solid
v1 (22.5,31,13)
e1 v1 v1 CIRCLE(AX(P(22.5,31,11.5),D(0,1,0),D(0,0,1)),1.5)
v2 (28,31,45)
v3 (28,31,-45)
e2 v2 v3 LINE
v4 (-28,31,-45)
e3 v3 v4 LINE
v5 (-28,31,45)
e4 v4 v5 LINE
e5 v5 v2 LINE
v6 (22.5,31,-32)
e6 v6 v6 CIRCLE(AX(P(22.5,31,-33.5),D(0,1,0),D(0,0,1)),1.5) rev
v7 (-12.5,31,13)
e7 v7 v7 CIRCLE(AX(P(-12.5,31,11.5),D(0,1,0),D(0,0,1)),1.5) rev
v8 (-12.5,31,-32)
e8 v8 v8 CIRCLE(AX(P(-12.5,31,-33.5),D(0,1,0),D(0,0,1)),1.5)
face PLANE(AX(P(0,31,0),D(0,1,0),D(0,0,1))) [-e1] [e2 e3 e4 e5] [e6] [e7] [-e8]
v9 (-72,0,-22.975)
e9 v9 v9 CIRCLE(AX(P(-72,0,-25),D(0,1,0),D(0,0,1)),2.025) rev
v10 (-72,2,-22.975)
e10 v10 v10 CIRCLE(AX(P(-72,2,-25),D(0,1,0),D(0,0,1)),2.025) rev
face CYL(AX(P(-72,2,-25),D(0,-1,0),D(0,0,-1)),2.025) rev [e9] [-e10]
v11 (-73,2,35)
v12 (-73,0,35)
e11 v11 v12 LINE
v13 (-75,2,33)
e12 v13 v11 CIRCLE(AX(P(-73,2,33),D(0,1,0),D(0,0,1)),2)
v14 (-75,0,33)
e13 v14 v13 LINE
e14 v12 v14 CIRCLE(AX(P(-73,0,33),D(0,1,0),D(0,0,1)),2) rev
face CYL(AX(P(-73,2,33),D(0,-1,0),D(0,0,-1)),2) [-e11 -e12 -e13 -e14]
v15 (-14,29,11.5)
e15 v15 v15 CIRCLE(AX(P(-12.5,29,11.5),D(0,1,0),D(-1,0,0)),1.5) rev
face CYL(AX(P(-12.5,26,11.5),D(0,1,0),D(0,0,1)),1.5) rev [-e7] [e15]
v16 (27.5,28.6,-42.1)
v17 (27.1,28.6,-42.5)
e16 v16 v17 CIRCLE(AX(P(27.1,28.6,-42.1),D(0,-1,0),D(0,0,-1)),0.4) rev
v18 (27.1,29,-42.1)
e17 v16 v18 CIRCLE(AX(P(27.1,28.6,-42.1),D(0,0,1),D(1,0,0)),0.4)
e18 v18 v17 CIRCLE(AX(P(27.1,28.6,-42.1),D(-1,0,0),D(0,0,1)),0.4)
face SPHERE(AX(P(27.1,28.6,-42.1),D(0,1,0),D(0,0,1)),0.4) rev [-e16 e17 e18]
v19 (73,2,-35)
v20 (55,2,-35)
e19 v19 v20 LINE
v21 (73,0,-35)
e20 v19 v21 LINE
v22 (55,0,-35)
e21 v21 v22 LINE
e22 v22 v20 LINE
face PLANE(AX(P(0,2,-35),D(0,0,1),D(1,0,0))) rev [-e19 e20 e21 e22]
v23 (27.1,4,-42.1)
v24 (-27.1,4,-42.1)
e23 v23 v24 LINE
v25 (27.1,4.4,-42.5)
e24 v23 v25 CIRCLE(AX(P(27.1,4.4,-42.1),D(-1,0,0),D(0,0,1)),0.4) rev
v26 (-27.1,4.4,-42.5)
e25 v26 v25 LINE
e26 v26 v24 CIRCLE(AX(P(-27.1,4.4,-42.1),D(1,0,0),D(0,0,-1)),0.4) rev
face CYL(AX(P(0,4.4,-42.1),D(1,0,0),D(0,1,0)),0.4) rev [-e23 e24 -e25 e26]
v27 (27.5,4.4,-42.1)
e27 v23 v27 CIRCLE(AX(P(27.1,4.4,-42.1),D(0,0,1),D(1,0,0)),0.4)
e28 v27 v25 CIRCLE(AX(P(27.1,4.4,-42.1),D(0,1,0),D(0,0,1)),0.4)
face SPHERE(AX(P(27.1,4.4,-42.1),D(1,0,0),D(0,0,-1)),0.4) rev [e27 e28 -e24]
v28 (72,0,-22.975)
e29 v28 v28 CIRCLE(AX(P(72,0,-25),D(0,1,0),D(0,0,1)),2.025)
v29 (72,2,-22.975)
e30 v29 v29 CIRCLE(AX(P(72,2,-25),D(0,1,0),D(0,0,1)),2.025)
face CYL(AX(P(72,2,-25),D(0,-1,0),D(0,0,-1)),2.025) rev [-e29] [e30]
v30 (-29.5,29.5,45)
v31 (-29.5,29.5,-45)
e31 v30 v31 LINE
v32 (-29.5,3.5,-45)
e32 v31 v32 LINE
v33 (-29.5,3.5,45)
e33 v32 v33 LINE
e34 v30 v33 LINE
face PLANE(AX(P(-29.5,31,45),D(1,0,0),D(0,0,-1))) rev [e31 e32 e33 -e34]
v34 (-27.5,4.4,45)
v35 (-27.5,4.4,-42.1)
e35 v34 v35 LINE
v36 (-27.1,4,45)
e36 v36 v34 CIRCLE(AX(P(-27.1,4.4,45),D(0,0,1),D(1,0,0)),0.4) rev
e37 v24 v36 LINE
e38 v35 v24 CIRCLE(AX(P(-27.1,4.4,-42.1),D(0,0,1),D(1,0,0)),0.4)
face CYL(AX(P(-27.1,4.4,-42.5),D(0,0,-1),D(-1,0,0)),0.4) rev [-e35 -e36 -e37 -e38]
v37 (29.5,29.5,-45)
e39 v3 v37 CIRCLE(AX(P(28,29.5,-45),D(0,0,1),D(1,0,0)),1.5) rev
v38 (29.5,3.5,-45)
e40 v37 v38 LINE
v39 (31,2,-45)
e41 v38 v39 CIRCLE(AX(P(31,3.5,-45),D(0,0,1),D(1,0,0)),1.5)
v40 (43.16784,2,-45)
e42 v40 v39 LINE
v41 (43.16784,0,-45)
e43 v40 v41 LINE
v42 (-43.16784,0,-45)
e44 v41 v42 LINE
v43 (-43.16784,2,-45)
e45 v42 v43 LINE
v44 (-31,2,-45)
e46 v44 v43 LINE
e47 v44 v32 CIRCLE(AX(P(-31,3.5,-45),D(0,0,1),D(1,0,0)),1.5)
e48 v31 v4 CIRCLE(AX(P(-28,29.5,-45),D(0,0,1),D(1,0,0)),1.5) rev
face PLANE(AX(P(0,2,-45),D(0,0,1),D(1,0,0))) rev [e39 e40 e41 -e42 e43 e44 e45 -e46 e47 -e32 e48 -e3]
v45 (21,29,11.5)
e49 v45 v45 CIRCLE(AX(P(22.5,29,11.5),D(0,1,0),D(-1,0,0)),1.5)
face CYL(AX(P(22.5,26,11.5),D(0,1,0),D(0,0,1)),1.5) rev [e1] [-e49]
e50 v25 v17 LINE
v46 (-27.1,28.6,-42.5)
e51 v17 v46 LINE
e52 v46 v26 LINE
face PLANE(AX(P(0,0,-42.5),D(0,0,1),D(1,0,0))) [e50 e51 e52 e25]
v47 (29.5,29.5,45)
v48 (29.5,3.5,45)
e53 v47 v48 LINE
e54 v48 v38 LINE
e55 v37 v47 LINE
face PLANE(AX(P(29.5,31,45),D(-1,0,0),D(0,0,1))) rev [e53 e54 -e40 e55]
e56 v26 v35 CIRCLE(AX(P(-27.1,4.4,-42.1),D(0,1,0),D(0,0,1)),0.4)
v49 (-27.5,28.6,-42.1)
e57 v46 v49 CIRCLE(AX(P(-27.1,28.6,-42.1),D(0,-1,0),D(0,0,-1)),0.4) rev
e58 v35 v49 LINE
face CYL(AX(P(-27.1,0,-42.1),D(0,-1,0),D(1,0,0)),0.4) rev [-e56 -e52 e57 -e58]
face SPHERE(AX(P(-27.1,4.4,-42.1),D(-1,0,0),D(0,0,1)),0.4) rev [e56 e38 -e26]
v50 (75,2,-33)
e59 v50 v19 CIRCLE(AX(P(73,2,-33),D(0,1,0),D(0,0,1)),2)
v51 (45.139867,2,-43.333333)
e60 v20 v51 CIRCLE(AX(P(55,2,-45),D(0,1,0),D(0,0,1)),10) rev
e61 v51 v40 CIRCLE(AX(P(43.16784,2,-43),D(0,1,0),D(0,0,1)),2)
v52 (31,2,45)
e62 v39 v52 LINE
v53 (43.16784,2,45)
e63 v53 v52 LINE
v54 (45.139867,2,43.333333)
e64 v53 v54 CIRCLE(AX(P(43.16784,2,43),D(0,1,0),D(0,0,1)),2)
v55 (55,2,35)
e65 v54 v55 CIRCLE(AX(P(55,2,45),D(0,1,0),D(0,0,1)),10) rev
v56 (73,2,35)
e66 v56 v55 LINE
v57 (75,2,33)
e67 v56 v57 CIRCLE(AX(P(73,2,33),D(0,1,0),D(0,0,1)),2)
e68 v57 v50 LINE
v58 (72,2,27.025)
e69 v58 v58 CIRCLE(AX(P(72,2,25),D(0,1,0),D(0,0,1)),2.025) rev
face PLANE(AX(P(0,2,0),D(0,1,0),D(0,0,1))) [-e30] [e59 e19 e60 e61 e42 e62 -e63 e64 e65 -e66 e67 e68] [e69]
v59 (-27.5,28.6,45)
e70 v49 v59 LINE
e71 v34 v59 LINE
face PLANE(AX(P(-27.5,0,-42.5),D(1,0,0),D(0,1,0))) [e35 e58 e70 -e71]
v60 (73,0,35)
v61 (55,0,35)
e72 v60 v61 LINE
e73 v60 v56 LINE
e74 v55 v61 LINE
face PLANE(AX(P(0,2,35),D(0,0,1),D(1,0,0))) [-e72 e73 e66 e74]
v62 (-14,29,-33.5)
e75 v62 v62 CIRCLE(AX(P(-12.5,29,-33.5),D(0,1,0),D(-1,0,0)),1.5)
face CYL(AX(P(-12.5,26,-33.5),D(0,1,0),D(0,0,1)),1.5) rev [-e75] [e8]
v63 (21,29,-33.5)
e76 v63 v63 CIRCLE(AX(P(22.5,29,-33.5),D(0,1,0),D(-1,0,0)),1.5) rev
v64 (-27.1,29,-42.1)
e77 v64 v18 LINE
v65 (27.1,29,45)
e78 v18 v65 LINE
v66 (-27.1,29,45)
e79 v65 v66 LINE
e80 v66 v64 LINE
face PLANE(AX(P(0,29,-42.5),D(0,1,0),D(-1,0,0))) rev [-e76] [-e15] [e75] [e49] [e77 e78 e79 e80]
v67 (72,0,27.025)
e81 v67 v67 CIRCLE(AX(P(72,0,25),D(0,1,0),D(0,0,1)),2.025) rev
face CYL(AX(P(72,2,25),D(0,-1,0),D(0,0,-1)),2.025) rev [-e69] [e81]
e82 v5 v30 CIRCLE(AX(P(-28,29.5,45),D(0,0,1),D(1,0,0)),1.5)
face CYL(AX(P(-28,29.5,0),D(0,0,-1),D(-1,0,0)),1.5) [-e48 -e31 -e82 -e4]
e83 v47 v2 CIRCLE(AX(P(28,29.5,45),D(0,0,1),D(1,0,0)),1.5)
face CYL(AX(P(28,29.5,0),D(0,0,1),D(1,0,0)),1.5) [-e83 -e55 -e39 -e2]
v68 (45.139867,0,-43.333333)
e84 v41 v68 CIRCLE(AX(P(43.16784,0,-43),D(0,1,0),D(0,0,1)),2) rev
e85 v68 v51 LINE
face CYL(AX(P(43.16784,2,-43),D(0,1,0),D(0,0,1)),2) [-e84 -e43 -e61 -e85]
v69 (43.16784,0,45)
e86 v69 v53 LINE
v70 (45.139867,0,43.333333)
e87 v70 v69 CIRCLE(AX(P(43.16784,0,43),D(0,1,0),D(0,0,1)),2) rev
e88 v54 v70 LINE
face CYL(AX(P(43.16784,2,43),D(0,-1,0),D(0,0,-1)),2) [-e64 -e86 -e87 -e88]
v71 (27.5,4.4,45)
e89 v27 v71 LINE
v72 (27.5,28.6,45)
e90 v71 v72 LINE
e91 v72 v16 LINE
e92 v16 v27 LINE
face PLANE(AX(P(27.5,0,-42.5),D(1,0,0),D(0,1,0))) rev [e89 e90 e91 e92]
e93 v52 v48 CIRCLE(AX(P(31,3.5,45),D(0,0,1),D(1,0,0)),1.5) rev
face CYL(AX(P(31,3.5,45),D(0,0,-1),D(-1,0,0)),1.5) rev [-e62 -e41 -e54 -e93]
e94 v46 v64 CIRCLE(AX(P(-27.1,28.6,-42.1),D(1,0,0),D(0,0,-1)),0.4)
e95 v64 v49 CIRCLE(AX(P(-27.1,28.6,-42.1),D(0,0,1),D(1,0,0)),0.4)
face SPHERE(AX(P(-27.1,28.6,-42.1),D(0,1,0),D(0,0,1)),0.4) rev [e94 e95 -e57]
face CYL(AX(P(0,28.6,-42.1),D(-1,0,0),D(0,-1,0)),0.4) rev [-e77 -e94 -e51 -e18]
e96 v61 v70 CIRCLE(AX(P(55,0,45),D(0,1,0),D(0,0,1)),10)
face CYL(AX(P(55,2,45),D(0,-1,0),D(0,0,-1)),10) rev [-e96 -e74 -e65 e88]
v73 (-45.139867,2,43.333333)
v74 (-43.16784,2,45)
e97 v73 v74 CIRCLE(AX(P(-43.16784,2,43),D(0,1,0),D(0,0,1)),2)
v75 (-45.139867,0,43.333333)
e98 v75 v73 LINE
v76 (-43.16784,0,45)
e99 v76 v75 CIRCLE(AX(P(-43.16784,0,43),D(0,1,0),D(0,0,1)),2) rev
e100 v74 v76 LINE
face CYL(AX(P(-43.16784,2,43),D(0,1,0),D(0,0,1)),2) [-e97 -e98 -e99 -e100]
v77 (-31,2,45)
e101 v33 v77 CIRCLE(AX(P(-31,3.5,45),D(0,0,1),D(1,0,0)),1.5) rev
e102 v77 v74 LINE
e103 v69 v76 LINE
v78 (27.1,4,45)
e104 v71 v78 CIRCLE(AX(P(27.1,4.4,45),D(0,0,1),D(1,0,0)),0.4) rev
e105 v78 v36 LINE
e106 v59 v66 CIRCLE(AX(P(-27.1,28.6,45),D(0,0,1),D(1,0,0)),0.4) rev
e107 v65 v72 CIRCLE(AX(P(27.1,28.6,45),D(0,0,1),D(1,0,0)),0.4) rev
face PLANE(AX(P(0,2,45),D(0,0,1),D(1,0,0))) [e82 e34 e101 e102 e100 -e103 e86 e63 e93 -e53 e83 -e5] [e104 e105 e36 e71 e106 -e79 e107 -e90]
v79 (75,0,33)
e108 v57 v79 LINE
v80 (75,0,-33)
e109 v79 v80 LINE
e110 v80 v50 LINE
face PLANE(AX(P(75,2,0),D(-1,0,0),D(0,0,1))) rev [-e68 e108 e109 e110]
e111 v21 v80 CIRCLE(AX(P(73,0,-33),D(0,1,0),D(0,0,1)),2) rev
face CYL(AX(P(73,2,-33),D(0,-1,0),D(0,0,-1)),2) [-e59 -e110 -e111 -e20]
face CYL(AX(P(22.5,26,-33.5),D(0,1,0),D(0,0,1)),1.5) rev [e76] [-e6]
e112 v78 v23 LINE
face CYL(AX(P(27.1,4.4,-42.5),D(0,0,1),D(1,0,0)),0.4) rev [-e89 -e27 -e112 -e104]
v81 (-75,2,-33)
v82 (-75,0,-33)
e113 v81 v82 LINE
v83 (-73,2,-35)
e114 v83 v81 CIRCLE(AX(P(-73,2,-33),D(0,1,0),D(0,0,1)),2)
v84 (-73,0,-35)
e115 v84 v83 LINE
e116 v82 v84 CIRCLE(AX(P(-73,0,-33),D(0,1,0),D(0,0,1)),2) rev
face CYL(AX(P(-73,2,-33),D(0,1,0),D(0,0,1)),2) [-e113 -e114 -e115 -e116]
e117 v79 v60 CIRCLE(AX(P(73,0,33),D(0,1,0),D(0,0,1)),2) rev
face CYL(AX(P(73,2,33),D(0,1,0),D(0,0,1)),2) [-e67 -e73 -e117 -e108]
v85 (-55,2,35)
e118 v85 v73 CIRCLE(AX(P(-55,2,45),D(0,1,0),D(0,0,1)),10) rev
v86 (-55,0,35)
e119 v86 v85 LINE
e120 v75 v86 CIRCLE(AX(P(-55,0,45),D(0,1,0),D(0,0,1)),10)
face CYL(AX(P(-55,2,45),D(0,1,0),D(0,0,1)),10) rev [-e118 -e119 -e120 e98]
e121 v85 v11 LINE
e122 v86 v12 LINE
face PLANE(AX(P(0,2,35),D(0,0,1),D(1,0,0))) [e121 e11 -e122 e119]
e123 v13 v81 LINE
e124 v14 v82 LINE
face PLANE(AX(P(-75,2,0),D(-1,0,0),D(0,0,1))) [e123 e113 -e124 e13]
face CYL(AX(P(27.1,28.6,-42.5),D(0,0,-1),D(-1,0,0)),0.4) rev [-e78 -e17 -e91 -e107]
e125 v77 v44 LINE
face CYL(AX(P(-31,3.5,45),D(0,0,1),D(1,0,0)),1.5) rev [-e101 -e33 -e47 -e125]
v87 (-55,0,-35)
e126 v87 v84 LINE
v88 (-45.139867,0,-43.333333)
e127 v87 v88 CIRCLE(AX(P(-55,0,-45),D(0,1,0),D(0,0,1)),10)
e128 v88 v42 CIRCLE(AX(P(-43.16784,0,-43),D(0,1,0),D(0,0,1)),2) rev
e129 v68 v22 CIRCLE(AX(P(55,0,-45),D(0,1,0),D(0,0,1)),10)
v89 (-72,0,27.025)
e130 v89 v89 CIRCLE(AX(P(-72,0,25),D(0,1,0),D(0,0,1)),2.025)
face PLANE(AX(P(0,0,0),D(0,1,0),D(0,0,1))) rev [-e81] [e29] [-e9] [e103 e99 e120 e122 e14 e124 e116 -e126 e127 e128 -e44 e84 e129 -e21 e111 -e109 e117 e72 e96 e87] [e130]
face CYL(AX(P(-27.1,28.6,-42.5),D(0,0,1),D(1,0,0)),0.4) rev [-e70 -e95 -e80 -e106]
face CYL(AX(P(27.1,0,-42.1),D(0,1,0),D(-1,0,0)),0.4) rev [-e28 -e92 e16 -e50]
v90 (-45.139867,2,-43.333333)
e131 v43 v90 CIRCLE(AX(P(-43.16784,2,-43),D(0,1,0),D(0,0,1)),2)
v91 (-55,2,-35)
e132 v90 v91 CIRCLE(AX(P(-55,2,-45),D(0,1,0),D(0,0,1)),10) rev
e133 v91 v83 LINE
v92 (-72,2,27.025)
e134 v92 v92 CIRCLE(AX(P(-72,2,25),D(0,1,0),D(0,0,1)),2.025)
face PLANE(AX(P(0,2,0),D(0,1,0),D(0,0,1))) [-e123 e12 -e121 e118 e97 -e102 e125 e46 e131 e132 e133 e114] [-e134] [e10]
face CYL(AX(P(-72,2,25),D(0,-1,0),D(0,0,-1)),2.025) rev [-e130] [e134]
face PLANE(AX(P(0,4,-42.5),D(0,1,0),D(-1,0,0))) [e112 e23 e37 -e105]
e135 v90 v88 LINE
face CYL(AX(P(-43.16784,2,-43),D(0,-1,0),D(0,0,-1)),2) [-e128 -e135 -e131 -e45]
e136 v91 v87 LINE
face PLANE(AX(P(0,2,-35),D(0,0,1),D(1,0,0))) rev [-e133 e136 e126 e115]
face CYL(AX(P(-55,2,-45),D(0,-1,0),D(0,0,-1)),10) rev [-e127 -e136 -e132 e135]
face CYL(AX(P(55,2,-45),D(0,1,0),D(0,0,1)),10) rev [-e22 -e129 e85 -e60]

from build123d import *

# Parameters (mm, degrees)
SKETCH1_W           = 90
SKETCH1_H           = 70
SKETCH1_W_2         = 30
SKETCH1_R           = 2.025
SKETCH1_H_2         = 10
BOSS_EXTRUDE1_DEPTH = 2
SKETCH2_W           = 59
SKETCH2_H           = 90
BOSS_EXTRUDE2_DEPTH = 29
SKETCH4_W           = 55
SKETCH4_H           = 25
CUT_EXTRUDE1_DEPTH  = 87.5
FILLET1_R           = 1.5
FILLET2_R           = 0.4
FILLET3_R           = 10
FILLET7_R           = 2
SKETCH7_R           = 1.5
CUT_EXTRUDE2_DEPTH  = 5


with BuildPart() as part:
    # Sketch1 → Boss-Extrude1 (new body)
    # profile 1 of 5: a face of its own
    with BuildSketch(Plane(origin=(0, 0, 0), x_dir=(1, 0, 0), z_dir=(0, 1, 0))):
        Rectangle(SKETCH1_W, SKETCH1_H)
    # profile 2 of 5: a face of its own
    with BuildSketch(Plane(origin=(0, 0, 0), x_dir=(1, 0, 0), z_dir=(0, 1, 0))):
        with Locations((-60, 0)):
            Rectangle(SKETCH1_W_2, SKETCH1_H)
        with Locations(Location((-72, -25, 0), (0, 0, 270))):
            Circle(SKETCH1_R, mode=Mode.SUBTRACT)
        with Locations(Location((-72, 25, 0), (0, 0, 270))):
            Circle(SKETCH1_R, mode=Mode.SUBTRACT)
    # profile 3 of 5: a face of its own
    with BuildSketch(Plane(origin=(0, 0, 0), x_dir=(1, 0, 0), z_dir=(0, 1, 0))):
        with Locations((60, 0)):
            Rectangle(SKETCH1_W_2, SKETCH1_H)
        with Locations(Location((72, -25, 0), (0, 0, 270))):
            Circle(SKETCH1_R, mode=Mode.SUBTRACT)
        with Locations(Location((72, 25, 0), (0, 0, 270))):
            Circle(SKETCH1_R, mode=Mode.SUBTRACT)
    # profile 4 of 5: a face of its own
    with BuildSketch(Plane(origin=(0, 0, 0), x_dir=(1, 0, 0), z_dir=(0, 1, 0))):
        with Locations((0, -40)):
            Rectangle(SKETCH1_W, SKETCH1_H_2)
    # profile 5 of 5: a face of its own
    with BuildSketch(Plane(origin=(0, 0, 0), x_dir=(1, 0, 0), z_dir=(0, 1, 0))):
        with Locations((0, 40)):
            Rectangle(SKETCH1_W, SKETCH1_H_2)
    extrude(amount=BOSS_EXTRUDE1_DEPTH)

    # Sketch2 → Boss-Extrude2 (add)
    with BuildSketch(Plane(origin=(0, 2, 0), x_dir=(1, 0, 0), z_dir=(0, 1, 0))):
        Rectangle(SKETCH2_W, SKETCH2_H)
    extrude(amount=BOSS_EXTRUDE2_DEPTH)

    # Sketch4 → Cut-Extrude1 (cut)
    with BuildSketch(Plane.XY.offset(45)):
        with Locations((0, 16.5)):
            Rectangle(SKETCH4_W, SKETCH4_H)
    extrude(amount=-CUT_EXTRUDE1_DEPTH, mode=Mode.SUBTRACT)

    # Fillet1
    fillet1_edges = [part.edges().sort_by_distance(p)[0] for p in [
        (-29.5, 2, 0),
        (29.5, 2, 0),
        (-29.5, 31, 0),
        (29.5, 31, 0),
    ]]
    fillet(fillet1_edges, radius=FILLET1_R)

    # Fillet2
    fillet2_edges = [part.edges().sort_by_distance(p)[0] for p in [
        (-27.5, 4, 1.25),
        (0, 29, -42.5),
        (-27.5, 29, 1.25),
        (27.5, 16.5, -42.5),
        (27.5, 29, 1.25),
        (27.5, 4, 1.25),
        (-27.5, 16.5, -42.5),
        (0, 4, -42.5),
    ]]
    fillet(fillet2_edges, radius=FILLET2_R)

    # Fillet3
    fillet3_edges = [part.edges().sort_by_distance(p)[0] for p in [
        (-45, 1, 35),
        (-45, 1, -35),
        (45, 1, -35),
        (45, 1, 35),
    ]]
    fillet(fillet3_edges, radius=FILLET3_R - 0.0001)  # a hair under: the kernel refuses the full size

    # Fillet7
    fillet7_edges = [part.edges().sort_by_distance(p)[0] for p in [
        (-45, 1, -45),
        (45, 1, -45),
        (75, 1, -35),
        (75, 1, 35),
        (45, 1, 45),
        (-45, 1, 45),
        (-75, 1, 35),
        (-75, 1, -35),
    ]]
    fillet(fillet7_edges, radius=FILLET7_R)

    # Sketch7 → Cut-Extrude2 (cut)
    with BuildSketch(Plane(origin=(0, 31, 0), x_dir=(1, 0, 0), z_dir=(0, 1, 0))):
        with Locations(Location((-12.5, 33.5, 0), (0, 0, 270))):
            Circle(SKETCH7_R)
        with Locations(Location((22.5, 33.5, 0), (0, 0, 270))):
            Circle(SKETCH7_R)
        with Locations(Location((22.5, -11.5, 0), (0, 0, 270))):
            Circle(SKETCH7_R)
        with Locations(Location((-12.5, -11.5, 0), (0, 0, 270))):
            Circle(SKETCH7_R)
    extrude(amount=-CUT_EXTRUDE2_DEPTH, mode=Mode.SUBTRACT)


solid = part.part
